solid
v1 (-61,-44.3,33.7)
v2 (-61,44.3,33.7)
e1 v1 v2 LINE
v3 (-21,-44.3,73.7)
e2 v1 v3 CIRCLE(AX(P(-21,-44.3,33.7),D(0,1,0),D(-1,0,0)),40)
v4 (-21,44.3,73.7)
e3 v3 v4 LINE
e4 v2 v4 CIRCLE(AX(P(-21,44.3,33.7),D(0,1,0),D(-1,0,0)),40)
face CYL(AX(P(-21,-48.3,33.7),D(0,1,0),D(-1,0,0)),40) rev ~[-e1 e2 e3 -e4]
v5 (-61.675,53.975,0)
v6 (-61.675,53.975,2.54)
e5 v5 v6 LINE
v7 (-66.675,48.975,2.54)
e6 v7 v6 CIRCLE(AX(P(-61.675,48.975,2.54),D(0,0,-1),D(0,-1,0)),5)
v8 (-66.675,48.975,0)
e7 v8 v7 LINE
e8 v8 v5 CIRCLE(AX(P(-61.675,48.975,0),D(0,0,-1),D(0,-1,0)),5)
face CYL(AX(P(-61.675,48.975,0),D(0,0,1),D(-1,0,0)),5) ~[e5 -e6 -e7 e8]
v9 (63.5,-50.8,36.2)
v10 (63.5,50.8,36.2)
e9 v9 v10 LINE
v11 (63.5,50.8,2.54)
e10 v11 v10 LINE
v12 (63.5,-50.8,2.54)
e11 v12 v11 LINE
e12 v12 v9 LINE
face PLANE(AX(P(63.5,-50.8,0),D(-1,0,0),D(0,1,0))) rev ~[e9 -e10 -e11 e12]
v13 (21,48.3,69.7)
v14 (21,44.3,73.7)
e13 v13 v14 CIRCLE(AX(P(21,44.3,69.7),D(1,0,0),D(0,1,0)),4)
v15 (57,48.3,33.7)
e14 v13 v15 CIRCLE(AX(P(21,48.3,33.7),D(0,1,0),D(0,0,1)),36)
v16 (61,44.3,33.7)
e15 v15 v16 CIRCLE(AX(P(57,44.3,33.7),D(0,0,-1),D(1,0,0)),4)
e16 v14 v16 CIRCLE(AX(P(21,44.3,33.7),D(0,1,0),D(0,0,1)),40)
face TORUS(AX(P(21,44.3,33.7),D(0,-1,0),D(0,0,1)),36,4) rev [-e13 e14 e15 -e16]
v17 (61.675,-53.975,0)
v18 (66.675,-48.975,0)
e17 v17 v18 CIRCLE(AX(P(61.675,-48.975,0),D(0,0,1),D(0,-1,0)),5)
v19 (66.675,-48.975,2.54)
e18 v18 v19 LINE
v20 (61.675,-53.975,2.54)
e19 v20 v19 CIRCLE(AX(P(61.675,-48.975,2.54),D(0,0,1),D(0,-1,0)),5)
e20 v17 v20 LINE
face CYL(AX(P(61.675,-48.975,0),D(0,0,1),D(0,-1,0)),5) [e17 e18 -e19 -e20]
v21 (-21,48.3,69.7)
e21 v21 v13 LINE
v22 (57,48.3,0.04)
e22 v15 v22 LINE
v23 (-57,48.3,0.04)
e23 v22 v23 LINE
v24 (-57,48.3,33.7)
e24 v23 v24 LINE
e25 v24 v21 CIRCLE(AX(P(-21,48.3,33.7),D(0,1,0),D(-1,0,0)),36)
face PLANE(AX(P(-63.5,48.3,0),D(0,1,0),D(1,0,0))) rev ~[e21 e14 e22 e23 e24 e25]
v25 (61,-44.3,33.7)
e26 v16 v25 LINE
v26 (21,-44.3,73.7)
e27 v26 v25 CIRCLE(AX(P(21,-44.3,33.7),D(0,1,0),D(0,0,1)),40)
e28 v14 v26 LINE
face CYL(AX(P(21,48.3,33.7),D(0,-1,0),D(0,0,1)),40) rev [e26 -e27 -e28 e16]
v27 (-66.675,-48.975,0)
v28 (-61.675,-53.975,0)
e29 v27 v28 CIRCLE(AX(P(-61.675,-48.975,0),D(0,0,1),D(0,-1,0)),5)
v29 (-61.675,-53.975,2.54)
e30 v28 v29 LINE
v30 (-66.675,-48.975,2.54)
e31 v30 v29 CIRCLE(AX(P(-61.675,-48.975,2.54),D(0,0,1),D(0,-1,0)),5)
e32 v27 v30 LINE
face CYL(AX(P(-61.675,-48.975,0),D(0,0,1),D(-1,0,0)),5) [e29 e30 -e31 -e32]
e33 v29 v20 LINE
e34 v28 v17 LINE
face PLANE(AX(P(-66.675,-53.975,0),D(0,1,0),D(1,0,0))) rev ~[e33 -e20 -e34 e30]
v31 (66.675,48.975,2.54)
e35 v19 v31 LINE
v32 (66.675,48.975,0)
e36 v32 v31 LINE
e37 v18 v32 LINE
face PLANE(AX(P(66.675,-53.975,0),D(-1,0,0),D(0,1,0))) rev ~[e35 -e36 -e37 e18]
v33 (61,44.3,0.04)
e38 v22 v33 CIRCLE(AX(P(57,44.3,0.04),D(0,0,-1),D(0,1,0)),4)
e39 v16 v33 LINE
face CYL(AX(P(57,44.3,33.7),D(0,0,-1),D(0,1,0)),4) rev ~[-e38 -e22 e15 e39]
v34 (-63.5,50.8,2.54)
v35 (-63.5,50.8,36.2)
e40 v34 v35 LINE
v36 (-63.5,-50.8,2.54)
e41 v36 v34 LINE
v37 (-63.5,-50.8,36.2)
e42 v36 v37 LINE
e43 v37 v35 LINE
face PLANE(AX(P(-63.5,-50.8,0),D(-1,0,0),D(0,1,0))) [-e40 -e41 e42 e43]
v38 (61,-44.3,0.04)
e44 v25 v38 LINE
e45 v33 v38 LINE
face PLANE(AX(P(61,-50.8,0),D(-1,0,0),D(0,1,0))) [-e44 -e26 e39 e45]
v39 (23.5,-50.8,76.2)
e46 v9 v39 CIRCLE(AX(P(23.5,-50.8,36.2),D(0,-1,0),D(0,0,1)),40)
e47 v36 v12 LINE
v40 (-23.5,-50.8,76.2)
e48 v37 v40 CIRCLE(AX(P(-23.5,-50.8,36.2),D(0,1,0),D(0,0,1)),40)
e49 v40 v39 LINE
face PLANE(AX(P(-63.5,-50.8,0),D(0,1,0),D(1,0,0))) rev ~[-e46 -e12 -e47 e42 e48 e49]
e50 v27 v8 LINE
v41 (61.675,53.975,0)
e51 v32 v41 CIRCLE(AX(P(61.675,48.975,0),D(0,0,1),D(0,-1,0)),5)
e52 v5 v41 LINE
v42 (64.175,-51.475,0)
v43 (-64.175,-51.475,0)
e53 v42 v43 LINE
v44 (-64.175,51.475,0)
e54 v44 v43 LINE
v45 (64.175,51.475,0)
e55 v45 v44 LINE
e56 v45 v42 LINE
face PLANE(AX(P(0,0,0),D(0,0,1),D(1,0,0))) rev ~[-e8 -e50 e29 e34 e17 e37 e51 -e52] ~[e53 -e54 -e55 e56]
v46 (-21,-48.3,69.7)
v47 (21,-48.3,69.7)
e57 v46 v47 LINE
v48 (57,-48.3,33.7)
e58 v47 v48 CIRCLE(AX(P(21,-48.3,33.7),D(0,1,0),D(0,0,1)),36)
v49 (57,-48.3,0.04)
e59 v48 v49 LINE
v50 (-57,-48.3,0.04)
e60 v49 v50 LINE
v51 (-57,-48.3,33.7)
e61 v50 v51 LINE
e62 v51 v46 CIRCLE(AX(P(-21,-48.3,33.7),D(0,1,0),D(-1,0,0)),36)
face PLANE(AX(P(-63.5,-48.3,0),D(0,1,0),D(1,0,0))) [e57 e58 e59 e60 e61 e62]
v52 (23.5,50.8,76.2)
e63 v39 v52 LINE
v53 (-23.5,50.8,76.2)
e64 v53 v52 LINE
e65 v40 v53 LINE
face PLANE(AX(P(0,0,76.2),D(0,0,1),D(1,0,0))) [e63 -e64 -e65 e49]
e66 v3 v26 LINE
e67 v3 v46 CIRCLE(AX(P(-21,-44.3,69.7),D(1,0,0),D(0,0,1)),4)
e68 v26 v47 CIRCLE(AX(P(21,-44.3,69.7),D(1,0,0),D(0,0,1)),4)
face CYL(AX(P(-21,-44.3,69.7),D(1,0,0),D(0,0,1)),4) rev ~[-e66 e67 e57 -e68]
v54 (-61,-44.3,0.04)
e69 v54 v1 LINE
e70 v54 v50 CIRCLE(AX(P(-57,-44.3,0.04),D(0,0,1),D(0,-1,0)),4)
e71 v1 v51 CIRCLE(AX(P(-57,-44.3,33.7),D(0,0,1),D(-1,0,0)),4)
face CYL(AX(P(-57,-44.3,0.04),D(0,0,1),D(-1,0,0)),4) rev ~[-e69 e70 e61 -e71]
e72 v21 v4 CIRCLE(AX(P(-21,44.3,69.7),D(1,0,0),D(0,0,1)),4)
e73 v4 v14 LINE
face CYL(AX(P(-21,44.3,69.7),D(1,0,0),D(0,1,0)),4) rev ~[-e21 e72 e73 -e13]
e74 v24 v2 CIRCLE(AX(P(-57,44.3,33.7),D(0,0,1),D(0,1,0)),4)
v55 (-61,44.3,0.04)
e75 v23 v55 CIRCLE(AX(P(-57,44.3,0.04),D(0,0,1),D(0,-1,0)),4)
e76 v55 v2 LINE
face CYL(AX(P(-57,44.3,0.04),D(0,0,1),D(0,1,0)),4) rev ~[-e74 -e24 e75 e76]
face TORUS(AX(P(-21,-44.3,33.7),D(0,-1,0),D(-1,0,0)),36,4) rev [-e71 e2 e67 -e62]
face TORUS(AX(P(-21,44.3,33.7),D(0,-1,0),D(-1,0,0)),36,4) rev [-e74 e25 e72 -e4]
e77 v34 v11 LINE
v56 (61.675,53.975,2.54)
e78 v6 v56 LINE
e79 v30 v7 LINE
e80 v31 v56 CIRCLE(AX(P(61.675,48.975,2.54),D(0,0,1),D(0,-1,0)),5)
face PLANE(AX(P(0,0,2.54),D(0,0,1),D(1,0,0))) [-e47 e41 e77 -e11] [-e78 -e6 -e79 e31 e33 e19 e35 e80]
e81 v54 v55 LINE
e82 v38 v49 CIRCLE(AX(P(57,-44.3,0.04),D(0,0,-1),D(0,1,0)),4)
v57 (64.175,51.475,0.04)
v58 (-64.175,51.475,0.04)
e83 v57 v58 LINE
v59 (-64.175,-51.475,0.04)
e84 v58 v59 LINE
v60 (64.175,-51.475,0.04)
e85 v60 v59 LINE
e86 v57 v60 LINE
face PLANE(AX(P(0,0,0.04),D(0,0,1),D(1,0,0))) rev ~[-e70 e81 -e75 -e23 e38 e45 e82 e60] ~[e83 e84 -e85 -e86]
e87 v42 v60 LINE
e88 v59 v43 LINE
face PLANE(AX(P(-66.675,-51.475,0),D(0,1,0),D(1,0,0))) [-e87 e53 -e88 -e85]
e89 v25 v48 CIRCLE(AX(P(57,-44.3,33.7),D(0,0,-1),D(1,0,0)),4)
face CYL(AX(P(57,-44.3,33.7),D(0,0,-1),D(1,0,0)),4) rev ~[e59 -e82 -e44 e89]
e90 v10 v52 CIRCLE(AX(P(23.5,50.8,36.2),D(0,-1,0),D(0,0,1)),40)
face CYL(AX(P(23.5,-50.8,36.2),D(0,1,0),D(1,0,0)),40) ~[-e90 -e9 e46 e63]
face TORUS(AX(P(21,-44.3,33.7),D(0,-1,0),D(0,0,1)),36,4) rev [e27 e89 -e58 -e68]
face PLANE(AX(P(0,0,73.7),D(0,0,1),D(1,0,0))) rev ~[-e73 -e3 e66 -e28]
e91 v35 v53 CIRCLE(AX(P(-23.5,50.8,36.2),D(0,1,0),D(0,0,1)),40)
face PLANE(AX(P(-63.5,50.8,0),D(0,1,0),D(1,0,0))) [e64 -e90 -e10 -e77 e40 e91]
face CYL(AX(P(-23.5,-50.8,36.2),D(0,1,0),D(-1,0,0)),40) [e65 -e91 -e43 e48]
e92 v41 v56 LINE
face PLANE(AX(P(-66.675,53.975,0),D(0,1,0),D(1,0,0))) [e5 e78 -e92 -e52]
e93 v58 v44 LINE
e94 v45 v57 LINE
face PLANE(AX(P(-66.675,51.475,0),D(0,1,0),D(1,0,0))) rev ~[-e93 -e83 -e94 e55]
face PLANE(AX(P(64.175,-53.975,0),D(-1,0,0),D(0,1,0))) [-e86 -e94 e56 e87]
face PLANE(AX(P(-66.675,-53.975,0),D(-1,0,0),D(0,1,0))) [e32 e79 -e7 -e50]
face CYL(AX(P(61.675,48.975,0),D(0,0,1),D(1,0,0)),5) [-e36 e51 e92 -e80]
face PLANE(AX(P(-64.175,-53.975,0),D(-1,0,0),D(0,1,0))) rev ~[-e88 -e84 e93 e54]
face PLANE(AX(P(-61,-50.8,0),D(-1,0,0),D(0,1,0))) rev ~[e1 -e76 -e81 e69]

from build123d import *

# Parameters (mm, degrees)
F0_W     = 133.35
F0_H     = 107.95
F1_DEPTH = 76.2
F2_W     = 127
F2_H     = 101.6
F3_DEPTH = 76.2
F4_DEPTH = 73.66
F5_DEPTH = 76.2
F6_T     = -2.5
F7_R     = 40
F8_R     = 4
F9_R     = 5
F10_R    = 40


with BuildPart() as f1:
    # F0 (on Top) → F1 (new body)
    with BuildSketch(Plane.XY):
        Rectangle(F0_W, F0_H)
    extrude(amount=F1_DEPTH)

    # F2 (on Top) → F3 (cut)
    with BuildSketch(Plane.XY):
        Rectangle(F2_W, F2_H)
    extrude(amount=F3_DEPTH, mode=Mode.SUBTRACT)

    # F4 (cut): a face of the model
    f4_faces = [f1.faces().sort_by_distance(p)[0] for p in [
        (64.9593244771, 0, 76.2),
    ]]
    extrude(f4_faces, amount=-F4_DEPTH, mode=Mode.SUBTRACT)

    # F2 (on Top) → F5 (join)
    with BuildSketch(Plane.XY):
        Rectangle(F2_W, F2_H)
    extrude(amount=F5_DEPTH)

    # F6
    f6_openings = [f1.faces().sort_by_distance(p)[0] for p in [
        (0, 0, 0),
    ]]
    offset(amount=F6_T, openings=f6_openings, kind=Kind.INTERSECTION)

    # F7
    f7_edges = [f1.edges().sort_by_distance(p)[0] for p in [
        (-61, 0, 73.7),
        (61, 0, 73.7),
    ]]
    fillet(f7_edges, radius=F7_R)

    # F8
    f8_edges = [f1.edges().sort_by_distance(p)[0] for p in [
        (-49.284271, -48.3, 61.984271),
        (49.284271, 48.3, 61.984271),
    ]]
    fillet(f8_edges, radius=F8_R)

    # F9
    f9_edges = [f1.edges().sort_by_distance(p)[0] for p in [
        (66.675, 53.975, 1.27),
        (66.675, -53.975, 1.27),
        (-66.675, -53.975, 1.27),
        (-66.675, 53.975, 1.27),
    ]]
    fillet(f9_edges, radius=F9_R)

    # F10
    f10_edges = [f1.edges().sort_by_distance(p)[0] for p in [
        (-63.5, 0, 76.2),
        (63.5, 0, 76.2),
    ]]
    fillet(f10_edges, radius=F10_R)


solid = f1.part
